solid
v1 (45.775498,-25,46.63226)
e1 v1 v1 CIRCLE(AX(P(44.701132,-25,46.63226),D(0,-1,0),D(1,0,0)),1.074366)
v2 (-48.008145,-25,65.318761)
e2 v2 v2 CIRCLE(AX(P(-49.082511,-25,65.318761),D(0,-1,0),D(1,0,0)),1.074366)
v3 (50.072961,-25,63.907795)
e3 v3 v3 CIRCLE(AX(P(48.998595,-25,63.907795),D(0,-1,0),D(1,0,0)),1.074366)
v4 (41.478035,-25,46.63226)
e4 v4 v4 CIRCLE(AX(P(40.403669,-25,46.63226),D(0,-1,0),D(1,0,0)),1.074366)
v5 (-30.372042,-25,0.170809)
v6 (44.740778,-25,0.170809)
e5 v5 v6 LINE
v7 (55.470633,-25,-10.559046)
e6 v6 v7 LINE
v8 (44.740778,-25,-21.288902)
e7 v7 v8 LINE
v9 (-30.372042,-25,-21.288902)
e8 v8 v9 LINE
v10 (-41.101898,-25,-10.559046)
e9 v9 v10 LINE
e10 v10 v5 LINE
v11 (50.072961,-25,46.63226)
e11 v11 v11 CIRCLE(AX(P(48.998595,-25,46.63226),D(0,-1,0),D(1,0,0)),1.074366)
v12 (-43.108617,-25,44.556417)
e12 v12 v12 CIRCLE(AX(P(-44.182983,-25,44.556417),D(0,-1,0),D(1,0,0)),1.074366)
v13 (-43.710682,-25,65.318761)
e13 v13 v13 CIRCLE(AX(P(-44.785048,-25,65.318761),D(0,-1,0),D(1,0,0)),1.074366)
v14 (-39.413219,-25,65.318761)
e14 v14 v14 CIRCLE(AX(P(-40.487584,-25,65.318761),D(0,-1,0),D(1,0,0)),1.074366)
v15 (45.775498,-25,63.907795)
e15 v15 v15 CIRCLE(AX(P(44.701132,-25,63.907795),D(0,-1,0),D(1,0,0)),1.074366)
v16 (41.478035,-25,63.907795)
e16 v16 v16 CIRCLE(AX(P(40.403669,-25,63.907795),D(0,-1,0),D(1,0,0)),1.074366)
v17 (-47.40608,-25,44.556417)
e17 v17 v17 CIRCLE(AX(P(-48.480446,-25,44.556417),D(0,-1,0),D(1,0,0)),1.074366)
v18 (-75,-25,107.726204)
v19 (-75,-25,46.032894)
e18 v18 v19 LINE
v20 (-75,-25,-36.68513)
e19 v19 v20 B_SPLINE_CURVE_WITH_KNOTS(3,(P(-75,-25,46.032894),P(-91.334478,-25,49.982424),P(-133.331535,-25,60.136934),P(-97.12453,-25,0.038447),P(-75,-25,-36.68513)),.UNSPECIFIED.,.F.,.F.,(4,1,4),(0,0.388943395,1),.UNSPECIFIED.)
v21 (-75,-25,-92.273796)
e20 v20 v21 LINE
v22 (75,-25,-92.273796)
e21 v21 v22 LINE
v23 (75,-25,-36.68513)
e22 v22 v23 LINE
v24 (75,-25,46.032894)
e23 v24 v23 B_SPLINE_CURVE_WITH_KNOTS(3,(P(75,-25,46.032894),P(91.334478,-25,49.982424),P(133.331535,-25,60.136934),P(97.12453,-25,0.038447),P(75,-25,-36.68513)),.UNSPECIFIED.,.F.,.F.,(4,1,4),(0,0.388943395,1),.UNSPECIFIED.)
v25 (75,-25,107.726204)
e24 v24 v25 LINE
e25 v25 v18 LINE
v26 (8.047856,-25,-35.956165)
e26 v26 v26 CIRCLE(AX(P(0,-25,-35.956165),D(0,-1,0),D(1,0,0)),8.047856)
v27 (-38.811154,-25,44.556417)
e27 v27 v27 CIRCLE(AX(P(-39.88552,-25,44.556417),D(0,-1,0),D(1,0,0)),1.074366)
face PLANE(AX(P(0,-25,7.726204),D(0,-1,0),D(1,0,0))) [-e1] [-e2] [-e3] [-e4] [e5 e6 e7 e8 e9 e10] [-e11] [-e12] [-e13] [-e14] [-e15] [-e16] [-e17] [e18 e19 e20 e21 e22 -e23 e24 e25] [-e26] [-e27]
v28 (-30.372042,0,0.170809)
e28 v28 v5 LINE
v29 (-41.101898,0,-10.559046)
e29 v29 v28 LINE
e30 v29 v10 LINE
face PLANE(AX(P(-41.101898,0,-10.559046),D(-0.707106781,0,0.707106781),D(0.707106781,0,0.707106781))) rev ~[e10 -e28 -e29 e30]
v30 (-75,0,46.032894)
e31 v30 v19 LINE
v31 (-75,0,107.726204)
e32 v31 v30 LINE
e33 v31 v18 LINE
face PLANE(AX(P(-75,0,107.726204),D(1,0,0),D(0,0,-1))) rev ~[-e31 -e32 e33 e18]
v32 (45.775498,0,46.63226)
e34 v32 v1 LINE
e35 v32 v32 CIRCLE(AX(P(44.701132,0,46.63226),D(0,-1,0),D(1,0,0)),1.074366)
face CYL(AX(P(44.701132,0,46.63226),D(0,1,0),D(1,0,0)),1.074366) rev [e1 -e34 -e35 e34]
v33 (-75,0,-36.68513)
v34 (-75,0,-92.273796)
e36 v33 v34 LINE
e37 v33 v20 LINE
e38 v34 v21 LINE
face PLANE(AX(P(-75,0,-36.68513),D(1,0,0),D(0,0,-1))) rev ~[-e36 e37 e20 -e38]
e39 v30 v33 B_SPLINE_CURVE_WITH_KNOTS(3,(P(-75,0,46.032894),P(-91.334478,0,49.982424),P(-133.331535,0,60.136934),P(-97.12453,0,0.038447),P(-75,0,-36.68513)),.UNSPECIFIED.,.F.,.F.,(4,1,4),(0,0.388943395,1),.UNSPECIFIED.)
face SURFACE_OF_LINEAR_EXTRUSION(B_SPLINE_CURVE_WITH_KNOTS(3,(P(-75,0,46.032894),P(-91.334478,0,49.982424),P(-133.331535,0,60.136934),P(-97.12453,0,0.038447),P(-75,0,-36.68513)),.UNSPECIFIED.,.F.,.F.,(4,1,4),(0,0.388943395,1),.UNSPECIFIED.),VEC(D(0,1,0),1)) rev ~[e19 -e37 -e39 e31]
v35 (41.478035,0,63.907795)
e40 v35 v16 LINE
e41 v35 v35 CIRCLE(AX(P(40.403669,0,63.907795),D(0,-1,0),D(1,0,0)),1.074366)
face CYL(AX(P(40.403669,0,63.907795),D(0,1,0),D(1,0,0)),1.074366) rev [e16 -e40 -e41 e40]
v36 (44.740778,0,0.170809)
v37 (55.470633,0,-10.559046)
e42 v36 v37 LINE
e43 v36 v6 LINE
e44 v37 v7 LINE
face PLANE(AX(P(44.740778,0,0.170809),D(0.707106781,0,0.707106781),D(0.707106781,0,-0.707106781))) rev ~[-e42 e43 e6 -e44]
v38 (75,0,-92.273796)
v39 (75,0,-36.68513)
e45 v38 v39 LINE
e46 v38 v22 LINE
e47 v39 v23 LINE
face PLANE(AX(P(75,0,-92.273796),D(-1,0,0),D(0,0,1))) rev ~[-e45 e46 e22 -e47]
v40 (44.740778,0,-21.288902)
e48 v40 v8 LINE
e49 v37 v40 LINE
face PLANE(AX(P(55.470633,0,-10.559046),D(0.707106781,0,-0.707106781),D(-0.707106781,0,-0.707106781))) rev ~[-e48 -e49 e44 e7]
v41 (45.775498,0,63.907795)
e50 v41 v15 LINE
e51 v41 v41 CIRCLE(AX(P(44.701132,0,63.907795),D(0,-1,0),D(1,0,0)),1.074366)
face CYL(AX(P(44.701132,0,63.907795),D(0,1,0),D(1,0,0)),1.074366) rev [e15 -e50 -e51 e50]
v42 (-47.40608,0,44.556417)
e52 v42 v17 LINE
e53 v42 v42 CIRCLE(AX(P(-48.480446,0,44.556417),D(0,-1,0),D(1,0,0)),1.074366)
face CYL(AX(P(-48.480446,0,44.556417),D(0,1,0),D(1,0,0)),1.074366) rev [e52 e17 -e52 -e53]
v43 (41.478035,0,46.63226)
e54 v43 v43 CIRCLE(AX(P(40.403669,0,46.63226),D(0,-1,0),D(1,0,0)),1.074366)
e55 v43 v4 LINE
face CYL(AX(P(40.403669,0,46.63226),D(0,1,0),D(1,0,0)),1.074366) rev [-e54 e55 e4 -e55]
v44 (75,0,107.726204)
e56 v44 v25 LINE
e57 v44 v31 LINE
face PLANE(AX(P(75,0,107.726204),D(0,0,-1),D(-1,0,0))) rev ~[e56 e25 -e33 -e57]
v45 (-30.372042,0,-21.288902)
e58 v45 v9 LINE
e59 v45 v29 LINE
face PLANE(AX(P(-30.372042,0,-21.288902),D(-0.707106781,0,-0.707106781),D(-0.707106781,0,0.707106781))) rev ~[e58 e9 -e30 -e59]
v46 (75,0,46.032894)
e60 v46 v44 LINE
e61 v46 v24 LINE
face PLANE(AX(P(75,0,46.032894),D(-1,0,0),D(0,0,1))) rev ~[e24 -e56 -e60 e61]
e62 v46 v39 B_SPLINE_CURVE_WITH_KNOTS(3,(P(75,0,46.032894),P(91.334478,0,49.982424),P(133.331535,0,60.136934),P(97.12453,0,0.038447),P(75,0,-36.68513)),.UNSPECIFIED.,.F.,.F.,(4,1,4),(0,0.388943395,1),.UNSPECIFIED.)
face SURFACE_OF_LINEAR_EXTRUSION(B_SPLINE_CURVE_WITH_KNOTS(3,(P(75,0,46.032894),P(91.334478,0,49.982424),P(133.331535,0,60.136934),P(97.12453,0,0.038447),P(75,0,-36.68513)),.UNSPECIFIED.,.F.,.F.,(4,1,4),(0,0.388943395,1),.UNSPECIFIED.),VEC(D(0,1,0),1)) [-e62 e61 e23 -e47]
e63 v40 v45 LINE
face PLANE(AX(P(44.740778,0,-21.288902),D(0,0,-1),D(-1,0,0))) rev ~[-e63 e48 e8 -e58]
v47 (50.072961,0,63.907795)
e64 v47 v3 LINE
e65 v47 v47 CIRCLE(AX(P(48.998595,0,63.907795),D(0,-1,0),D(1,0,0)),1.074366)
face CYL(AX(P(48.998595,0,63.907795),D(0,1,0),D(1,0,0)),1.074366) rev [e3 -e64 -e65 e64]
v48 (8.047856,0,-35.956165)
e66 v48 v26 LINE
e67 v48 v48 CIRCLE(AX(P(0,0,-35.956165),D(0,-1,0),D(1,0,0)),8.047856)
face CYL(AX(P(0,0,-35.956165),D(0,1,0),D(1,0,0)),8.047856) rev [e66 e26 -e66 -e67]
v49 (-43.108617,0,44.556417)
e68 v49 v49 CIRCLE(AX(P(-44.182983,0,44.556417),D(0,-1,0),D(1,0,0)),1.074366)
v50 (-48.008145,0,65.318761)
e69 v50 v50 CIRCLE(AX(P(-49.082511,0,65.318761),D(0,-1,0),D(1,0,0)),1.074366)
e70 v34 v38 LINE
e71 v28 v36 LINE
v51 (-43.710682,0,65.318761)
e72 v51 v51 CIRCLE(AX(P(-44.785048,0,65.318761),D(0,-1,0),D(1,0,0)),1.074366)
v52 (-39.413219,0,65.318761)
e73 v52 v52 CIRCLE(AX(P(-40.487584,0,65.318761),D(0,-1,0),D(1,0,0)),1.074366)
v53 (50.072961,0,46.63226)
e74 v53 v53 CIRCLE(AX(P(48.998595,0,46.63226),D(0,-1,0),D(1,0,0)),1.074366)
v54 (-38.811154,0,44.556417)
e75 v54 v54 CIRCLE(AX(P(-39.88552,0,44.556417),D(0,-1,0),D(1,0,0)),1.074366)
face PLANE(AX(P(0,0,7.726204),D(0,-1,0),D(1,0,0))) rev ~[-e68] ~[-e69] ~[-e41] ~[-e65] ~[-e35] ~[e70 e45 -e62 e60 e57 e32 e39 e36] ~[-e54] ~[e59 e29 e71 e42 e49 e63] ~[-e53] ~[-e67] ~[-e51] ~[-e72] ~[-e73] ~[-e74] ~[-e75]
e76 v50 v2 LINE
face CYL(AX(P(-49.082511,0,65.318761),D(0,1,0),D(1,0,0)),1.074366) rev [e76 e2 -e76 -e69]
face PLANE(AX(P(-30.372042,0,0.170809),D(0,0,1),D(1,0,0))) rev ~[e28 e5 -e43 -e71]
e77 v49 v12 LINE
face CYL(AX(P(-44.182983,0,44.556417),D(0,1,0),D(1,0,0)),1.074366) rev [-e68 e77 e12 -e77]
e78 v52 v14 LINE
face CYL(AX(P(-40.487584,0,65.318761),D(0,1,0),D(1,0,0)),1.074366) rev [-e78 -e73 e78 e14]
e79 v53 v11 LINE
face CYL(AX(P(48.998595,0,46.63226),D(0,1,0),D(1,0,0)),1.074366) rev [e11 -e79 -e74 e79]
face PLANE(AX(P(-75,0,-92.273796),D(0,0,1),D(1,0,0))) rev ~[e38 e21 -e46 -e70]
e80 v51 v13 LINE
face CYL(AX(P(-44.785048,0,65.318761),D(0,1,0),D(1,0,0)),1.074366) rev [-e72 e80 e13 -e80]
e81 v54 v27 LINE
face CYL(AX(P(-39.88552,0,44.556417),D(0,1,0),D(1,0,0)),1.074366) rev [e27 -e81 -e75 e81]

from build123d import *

# Parameters (mm, degrees)
F0_R     = 8.047855898
F0_R_2   = 1.0743657774
F1_DEPTH = 25


# Not quite as in the source:
# - the program builds the solid bodies; features that only make, move or delete a surface that nothing else refers to are left out


with BuildPart() as f1:
    # F0 (on Front) → F1 (new body)
    with BuildSketch(Plane.XZ):
        Polygon((75, 46.0328937352), (75, 107.7262044382), (-75, 107.7262044382), (-75, 46.0328937352), (-75, -36.6851300407), (-75, -92.2737955618), (75, -92.2737955618), (75, -36.6851300407), align=None)
        with Locations((0, -35.9561647287)):
            Circle(F0_R, mode=Mode.SUBTRACT)
        Polygon((44.7407775558, -21.2889015805), (-30.3720422538, -21.2889015805), (-41.1018976561, -10.5590461782), (-30.3720422538, 0.1708092241), (44.7407775558, 0.1708092241), (55.4706329581, -10.5590461782), align=None, mode=Mode.SUBTRACT)
        with Locations((-48.4804458196, 44.5564172655)):
            Circle(F0_R_2, mode=Mode.SUBTRACT)
        with Locations((-44.1829827099, 44.5564172655)):
            Circle(F0_R_2, mode=Mode.SUBTRACT)
        with Locations((-39.8855196001, 44.5564172655)):
            Circle(F0_R_2, mode=Mode.SUBTRACT)
        with Locations((-49.0825107104, 65.3187614809)):
            Circle(F0_R_2, mode=Mode.SUBTRACT)
        with Locations((-44.7850476006, 65.3187614809)):
            Circle(F0_R_2, mode=Mode.SUBTRACT)
        with Locations((-40.4875844908, 65.3187614809)):
            Circle(F0_R_2, mode=Mode.SUBTRACT)
        with Locations((40.4036690891, 46.6322604282)):
            Circle(F0_R_2, mode=Mode.SUBTRACT)
        with Locations((44.7011321989, 46.6322604282)):
            Circle(F0_R_2, mode=Mode.SUBTRACT)
        with Locations((48.9985953086, 46.6322604282)):
            Circle(F0_R_2, mode=Mode.SUBTRACT)
        with Locations((40.4036690891, 63.9077951499)):
            Circle(F0_R_2, mode=Mode.SUBTRACT)
        with Locations((44.7011321989, 63.9077951499)):
            Circle(F0_R_2, mode=Mode.SUBTRACT)
        with Locations((48.9985953086, 63.9077951499)):
            Circle(F0_R_2, mode=Mode.SUBTRACT)
        with BuildLine():
            add(Edge.make_bspline(
                [(75, 46.0328937352), (91.3344780181, 49.9824236443), (133.3315352118, 60.1369344463), (97.1245297955, 0.0384474003), (75, -36.6851300407)],
                knots=[0, 0, 0, 0, 0.3889433953, 1, 1, 1, 1], degree=3))
            Line((75, 46.0328937352), (75, -36.6851300407))
        make_face()
        with BuildLine():
            Line((-75, -36.6851300407), (-75, 46.0328937352))
            add(Edge.make_bspline(
                [(-75, 46.0328937352), (-91.3344780181, 49.9824236443), (-133.3315352118, 60.1369344463), (-97.1245297955, 0.0384474003), (-75, -36.6851300407)],
                knots=[0, 0, 0, 0, 0.3889433953, 1, 1, 1, 1], degree=3))
        make_face()
    extrude(amount=F1_DEPTH)


solid = f1.part
